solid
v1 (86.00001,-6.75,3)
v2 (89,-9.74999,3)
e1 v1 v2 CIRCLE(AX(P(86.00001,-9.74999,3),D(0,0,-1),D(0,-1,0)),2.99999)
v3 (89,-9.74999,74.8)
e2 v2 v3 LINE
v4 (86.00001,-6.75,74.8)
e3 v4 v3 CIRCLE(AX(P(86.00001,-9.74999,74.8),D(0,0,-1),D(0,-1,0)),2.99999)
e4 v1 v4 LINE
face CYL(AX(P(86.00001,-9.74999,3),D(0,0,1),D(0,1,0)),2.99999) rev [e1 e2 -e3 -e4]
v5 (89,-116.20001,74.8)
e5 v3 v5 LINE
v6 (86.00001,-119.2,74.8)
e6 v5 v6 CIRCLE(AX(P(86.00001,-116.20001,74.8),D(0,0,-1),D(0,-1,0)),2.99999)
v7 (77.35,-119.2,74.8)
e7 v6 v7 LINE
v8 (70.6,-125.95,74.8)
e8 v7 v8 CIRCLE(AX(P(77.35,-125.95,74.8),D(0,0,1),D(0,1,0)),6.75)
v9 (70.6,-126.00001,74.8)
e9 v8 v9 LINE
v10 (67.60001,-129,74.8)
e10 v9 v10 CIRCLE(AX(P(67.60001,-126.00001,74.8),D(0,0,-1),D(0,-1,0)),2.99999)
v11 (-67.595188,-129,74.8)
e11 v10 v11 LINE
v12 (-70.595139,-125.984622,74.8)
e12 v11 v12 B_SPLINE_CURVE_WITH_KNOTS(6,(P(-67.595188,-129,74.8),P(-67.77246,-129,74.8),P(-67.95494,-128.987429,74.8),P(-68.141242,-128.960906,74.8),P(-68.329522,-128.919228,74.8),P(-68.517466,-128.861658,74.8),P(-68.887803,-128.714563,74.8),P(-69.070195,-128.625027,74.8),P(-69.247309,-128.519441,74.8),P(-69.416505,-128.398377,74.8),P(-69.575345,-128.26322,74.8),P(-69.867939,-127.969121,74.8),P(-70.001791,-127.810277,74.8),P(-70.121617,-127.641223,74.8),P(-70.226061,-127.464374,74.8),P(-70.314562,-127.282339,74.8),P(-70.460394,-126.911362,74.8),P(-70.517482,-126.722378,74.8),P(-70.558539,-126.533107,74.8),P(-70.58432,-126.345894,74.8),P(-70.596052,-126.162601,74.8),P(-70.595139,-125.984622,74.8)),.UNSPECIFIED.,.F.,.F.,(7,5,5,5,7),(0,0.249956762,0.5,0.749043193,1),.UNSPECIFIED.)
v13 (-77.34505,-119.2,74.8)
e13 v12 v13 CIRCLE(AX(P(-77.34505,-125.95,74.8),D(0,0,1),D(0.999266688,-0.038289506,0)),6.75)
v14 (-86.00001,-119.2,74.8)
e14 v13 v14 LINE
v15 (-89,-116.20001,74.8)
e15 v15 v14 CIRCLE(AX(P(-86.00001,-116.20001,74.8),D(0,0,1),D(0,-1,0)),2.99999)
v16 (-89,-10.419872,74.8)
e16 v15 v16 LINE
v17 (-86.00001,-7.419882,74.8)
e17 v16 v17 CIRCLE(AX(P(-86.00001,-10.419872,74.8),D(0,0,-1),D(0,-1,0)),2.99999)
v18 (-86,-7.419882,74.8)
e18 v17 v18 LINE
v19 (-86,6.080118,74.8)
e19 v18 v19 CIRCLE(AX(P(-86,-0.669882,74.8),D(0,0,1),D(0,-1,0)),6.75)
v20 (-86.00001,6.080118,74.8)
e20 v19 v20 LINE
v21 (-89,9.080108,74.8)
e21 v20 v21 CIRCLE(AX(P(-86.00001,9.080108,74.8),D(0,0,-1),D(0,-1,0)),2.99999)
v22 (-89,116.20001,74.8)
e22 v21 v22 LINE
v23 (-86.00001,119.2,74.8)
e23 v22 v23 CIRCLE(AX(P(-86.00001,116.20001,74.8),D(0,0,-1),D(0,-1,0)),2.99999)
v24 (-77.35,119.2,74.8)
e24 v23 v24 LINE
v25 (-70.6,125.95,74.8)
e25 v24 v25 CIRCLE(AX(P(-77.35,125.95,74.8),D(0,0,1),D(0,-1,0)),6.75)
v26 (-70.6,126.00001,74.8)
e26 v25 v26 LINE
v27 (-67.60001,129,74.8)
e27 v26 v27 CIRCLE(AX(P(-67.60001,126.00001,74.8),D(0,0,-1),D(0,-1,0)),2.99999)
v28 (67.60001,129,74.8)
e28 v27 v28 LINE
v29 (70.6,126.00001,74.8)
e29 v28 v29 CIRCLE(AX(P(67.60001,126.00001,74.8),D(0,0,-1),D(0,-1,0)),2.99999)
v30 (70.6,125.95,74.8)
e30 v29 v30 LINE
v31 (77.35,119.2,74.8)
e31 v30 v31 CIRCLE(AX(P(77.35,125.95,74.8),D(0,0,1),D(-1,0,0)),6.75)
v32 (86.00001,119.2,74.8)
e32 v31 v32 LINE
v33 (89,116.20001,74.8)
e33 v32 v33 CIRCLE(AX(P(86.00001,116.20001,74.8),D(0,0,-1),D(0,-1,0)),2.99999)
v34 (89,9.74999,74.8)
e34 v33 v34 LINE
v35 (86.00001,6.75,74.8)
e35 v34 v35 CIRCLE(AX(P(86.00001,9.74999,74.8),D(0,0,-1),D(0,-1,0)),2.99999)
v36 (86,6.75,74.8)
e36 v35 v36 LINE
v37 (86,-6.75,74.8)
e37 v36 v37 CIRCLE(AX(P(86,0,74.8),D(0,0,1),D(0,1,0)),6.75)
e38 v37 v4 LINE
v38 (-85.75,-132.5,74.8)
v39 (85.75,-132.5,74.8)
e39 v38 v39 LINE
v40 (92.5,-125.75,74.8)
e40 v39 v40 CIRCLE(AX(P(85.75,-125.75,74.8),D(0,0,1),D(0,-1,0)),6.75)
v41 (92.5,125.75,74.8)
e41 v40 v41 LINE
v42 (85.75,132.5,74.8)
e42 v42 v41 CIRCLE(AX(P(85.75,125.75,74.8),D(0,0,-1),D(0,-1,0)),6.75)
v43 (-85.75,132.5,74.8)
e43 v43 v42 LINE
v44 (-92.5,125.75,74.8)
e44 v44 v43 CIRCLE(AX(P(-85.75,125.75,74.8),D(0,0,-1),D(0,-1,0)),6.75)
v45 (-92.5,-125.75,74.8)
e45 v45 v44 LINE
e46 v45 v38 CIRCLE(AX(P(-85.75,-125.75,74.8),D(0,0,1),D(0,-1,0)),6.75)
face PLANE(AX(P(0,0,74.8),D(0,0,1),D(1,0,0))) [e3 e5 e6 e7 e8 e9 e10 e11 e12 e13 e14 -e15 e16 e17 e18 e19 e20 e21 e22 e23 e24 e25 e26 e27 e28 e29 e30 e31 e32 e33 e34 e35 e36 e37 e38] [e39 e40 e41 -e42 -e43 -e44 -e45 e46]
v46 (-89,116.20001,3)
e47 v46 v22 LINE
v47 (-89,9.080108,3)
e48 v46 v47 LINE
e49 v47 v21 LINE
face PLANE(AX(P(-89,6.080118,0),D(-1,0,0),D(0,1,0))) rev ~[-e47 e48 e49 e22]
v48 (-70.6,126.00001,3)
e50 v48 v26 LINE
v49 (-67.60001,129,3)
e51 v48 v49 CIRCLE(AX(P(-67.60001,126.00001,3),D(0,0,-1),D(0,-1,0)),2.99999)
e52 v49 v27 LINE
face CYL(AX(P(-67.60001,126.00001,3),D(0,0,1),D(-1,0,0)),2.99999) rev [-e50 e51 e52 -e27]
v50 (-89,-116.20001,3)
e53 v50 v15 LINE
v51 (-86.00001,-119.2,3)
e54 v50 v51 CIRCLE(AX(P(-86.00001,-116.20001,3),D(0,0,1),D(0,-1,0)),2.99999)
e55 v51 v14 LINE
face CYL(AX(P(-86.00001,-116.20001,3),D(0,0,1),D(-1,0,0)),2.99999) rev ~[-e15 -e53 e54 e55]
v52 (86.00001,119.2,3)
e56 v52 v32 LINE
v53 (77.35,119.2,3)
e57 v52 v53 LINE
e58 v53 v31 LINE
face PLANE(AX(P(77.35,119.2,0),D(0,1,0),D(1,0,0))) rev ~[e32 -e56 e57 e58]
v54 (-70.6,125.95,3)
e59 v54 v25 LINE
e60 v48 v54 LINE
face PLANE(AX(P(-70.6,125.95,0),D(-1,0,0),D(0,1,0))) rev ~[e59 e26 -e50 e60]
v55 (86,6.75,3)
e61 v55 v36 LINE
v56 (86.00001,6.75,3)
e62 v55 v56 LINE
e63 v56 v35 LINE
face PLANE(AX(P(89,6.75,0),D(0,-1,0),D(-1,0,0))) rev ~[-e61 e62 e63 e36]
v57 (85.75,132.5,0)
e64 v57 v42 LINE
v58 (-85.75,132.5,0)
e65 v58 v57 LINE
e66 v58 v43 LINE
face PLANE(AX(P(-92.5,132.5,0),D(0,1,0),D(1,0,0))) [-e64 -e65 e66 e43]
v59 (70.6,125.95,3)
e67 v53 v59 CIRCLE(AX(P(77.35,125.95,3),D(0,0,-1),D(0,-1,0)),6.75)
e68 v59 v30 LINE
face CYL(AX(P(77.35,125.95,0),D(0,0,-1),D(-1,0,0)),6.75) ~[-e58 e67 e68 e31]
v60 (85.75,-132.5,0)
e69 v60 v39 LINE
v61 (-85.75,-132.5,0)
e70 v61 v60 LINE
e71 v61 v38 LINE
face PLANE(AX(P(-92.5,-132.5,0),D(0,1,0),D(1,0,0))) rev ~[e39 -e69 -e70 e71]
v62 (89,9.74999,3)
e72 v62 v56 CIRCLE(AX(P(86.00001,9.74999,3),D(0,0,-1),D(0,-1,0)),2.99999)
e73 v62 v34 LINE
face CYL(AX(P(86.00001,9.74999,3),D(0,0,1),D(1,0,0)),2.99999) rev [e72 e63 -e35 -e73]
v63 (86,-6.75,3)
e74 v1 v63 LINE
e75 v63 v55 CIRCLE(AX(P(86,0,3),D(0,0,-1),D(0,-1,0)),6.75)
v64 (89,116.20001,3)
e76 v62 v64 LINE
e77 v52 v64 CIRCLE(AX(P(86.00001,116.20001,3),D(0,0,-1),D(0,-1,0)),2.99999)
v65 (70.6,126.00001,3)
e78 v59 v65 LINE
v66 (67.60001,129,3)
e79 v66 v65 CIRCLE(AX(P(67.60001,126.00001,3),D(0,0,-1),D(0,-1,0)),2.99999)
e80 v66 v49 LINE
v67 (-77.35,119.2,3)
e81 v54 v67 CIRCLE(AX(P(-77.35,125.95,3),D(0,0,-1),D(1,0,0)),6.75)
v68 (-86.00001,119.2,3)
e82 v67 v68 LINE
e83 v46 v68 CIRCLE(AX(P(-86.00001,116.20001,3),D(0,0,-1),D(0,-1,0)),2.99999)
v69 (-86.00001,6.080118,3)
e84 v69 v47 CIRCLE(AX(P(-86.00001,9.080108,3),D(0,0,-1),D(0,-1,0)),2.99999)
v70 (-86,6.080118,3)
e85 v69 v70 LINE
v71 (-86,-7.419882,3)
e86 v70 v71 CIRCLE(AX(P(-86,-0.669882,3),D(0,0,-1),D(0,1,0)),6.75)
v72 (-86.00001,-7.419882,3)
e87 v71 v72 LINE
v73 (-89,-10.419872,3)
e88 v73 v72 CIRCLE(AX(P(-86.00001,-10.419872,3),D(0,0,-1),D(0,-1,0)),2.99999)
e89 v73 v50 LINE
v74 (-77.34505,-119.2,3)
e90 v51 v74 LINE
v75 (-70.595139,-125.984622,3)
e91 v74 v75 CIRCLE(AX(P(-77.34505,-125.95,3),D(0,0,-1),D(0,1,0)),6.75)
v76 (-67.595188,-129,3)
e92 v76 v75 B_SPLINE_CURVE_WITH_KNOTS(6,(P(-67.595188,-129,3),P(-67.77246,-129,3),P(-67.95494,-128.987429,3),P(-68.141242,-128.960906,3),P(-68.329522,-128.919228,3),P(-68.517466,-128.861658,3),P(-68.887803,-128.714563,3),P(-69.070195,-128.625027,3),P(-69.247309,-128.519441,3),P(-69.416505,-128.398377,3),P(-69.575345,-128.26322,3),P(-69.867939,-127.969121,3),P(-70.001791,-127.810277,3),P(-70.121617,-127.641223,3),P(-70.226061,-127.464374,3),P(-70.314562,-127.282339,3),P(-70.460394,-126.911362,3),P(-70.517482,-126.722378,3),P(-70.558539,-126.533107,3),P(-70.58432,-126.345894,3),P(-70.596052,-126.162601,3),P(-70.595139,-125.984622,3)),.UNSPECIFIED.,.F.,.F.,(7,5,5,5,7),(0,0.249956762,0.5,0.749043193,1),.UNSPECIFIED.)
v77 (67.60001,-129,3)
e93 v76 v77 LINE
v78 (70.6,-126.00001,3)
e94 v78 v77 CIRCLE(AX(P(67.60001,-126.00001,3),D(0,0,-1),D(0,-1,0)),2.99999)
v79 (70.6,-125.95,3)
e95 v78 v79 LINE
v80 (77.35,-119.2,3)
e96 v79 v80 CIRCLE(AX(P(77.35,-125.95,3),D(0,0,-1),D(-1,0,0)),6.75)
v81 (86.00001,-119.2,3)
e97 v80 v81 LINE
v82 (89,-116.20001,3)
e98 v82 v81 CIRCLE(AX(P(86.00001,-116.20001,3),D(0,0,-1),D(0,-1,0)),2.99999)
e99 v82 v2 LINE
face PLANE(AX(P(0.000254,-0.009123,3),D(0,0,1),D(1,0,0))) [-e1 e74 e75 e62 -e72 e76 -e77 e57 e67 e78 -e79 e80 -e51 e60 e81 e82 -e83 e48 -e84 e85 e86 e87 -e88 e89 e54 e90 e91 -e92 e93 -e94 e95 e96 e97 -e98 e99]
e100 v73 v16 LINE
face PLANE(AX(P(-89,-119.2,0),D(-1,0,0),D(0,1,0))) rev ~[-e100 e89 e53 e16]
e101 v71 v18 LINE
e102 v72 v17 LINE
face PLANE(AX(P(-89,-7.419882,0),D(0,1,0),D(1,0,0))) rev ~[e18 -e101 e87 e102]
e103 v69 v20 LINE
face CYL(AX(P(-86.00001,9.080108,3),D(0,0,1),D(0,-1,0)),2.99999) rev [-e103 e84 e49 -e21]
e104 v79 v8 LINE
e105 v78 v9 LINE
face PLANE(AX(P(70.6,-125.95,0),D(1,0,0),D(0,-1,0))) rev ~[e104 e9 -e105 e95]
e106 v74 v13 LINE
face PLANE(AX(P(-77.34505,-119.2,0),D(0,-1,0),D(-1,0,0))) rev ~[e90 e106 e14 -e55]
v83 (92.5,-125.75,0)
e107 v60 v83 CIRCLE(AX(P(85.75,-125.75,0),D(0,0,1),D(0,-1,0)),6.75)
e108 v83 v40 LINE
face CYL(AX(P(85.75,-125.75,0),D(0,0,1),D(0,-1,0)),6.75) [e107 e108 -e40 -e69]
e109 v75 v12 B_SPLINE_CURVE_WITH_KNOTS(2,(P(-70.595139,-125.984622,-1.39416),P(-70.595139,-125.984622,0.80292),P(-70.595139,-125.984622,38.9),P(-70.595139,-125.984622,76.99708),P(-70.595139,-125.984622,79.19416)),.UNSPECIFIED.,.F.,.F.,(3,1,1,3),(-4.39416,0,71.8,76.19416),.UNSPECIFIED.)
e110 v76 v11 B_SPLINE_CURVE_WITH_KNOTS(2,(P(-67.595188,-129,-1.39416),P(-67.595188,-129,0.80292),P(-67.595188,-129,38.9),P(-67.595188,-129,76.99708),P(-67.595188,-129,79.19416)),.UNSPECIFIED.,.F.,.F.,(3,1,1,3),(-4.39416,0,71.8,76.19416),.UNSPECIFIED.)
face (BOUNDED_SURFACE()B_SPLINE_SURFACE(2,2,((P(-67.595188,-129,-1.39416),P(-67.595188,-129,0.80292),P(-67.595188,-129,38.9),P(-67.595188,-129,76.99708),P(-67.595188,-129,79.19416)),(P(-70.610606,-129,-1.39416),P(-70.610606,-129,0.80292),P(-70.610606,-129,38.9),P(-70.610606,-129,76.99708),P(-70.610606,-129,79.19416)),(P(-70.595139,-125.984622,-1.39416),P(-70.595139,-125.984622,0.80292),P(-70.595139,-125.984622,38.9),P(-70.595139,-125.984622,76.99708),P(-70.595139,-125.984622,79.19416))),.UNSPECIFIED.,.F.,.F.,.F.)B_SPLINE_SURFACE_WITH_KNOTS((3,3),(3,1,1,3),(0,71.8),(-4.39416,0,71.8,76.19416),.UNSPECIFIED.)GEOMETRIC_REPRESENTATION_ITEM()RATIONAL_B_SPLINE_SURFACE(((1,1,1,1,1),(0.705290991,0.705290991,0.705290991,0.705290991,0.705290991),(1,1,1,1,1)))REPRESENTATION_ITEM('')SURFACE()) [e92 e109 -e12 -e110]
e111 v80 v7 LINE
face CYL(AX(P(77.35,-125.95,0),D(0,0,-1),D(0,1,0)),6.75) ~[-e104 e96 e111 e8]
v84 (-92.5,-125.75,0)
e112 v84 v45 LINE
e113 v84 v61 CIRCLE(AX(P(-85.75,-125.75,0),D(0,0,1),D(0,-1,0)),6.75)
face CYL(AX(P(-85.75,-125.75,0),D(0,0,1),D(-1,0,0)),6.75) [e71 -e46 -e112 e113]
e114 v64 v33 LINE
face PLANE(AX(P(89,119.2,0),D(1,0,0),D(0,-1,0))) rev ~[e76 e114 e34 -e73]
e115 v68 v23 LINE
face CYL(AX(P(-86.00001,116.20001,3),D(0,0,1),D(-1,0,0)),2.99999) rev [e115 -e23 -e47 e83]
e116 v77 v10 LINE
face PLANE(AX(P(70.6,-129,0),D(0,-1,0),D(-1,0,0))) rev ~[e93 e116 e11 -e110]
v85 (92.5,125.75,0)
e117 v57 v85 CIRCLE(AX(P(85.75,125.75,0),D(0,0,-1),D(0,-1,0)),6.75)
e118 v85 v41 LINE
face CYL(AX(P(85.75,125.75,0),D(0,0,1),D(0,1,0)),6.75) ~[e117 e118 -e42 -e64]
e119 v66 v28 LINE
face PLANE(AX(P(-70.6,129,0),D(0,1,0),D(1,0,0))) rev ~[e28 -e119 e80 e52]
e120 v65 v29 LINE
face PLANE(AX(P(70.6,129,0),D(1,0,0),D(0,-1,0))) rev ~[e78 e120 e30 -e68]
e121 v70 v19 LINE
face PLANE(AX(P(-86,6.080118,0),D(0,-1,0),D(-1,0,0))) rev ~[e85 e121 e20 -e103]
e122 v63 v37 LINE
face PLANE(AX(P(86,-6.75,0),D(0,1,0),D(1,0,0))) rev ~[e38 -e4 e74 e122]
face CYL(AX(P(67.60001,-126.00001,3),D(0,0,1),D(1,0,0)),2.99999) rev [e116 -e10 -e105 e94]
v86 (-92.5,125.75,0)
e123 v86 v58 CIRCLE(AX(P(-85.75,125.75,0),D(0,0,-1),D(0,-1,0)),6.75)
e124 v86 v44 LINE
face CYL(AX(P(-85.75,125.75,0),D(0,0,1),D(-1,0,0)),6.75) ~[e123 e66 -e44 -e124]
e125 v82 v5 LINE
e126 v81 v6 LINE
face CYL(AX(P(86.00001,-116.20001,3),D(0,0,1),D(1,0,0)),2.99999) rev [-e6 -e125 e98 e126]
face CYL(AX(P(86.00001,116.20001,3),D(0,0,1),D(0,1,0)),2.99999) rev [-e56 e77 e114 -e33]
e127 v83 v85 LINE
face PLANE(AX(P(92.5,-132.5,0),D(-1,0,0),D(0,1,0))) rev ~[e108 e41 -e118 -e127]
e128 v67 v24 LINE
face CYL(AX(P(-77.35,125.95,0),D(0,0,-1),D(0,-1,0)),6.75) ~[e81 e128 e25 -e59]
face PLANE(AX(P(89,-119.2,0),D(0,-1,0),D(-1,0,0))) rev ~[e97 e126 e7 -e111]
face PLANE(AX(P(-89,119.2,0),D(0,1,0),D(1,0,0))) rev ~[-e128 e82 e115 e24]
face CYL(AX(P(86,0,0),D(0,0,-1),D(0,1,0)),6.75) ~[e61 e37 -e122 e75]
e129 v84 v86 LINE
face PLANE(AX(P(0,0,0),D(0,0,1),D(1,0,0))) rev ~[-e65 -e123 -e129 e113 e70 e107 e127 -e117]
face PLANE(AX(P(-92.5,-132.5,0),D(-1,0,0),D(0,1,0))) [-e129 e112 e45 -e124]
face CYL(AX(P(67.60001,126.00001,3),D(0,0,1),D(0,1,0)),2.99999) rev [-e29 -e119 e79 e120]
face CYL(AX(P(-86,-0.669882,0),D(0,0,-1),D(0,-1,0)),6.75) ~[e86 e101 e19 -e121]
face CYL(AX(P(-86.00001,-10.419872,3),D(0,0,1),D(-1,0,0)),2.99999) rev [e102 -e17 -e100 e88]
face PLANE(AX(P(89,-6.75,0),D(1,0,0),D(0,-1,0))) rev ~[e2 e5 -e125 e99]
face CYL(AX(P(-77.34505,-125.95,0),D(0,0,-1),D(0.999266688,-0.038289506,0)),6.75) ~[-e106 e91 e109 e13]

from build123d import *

# Parameters (mm, degrees)
F1_DEPTH = 3
F0_W     = 185
F0_H     = 265
F2_DEPTH = 74.8
F3_R     = 6.75
F4_R     = 2.99999


# Not quite as in the source:
# - a fillet or chamfer is up to 0.001 mm smaller than in the source, because OpenCascade refuses the exact size
# - ends of sketch curves that miss each other by under 0.0002 mm in the source are joined


with BuildPart() as f1:
    # F0 (on Top) → F1 (new body)
    with BuildSketch(Plane.XY):
        with BuildLine():
            Line((70.6, 125.95), (70.6, 129))
            Line((70.6, 129), (-70.6, 129))
            Line((-70.6, 129), (-70.6, 125.95))
            ThreePointArc((-70.6, 125.95), (-72.577029227, 121.177029227), (-77.35, 119.2))
            Line((-77.35, 119.2), (-89, 119.2))
            Line((-89, 119.2), (-89, 6.080118008))
            Line((-89, 6.080118008), (-86, 6.080118008))
            ThreePointArc((-86, 6.080118008), (-79.25, -0.669881992), (-86, -7.419881992))
            Line((-86, -7.419881992), (-89, -7.419881992))
            Line((-89, -7.419881992), (-89, -119.2))
            Line((-89, -119.2), (-77.3450501441, -119.2))
            ThreePointArc((-77.3450501441, -119.2), (-72.4815603684, -121.2692984284), (-70.6, -126.2084541623))
            Line((-70.6, -126.2084541623), (-70.6, -129))
            Line((-70.6, -129), (70.6, -129))
            Line((70.6, -129), (70.6, -125.95))
            ThreePointArc((70.6, -125.95), (72.577029227, -121.177029227), (77.35, -119.2))
            Line((77.35, -119.2), (89, -119.2))
            Line((89, -119.2), (89, -6.75))
            Line((89, -6.75), (86, -6.75))
            ThreePointArc((86, -6.75), (79.25, 0), (86, 6.75))
            Line((86, 6.75), (89, 6.75))
            Line((89, 6.75), (89, 119.2))
            Line((89, 119.2), (77.35, 119.2))
            ThreePointArc((77.35, 119.2), (72.577029227, 121.177029227), (70.6, 125.95))
        make_face()
    extrude(amount=F1_DEPTH)

    # F0 (on Top) → F2 (join)
    with BuildSketch(Plane.XY):
        Rectangle(F0_W, F0_H)
        Polygon((70.6, 129), (89, 129), (89, 119.2), (89, 6.75), (89, -6.75), (89, -119.2), (89, -129), (70.6, -129), (-70.6, -129), (-89, -129), (-89, -119.2), (-89, -7.419881992), (-89, 6.080118008), (-89, 119.2), (-89, 129), (-70.6, 129), align=None, mode=Mode.SUBTRACT)
        with BuildLine():
            Line((-77.3450501441, -119.2), (-89, -119.2))
            Line((-89, -119.2), (-89, -129))
            Line((-89, -129), (-70.6, -129))
            Line((-70.6, -129), (-70.6, -126.2084541623))
            ThreePointArc((-70.6, -126.2084541623), (-72.4815603684, -121.2692984284), (-77.3450501441, -119.2))
        make_face()
        with BuildLine():
            Line((89, -129), (89, -119.2))
            Line((89, -119.2), (77.35, -119.2))
            ThreePointArc((77.35, -119.2), (72.577029227, -121.177029227), (70.6, -125.95))
            Line((70.6, -125.95), (70.6, -129.000006485))
            Line((70.6, -129.000006485), (89, -129))
        make_face()
        with BuildLine():
            Line((-70.6, 125.95), (-70.6, 129))
            Line((-70.6, 129), (-89, 129))
            Line((-89, 129), (-89, 119.2))
            Line((-89, 119.2), (-77.35, 119.2))
            ThreePointArc((-77.35, 119.2), (-72.577029227, 121.177029227), (-70.6, 125.95))
        make_face()
        with BuildLine():
            Line((89, 119.2), (89, 129))
            Line((89, 129), (70.6, 129))
            Line((70.6, 129), (70.6, 125.95))
            ThreePointArc((70.6, 125.95), (72.577029227, 121.177029227), (77.35, 119.2))
            Line((77.35, 119.2), (89, 119.2))
        make_face()
        with BuildLine():
            Line((-86, 6.080118008), (-89, 6.080118008))
            Line((-89, 6.080118008), (-89, -7.419881992))
            Line((-89, -7.419881992), (-86, -7.419881992))
            ThreePointArc((-86, -7.419881992), (-79.25, -0.669881992), (-86, 6.080118008))
        make_face()
        with BuildLine():
            Line((89, -6.75), (89, 6.75))
            Line((89, 6.75), (86, 6.75))
            ThreePointArc((86, 6.75), (79.25, 0), (86, -6.75))
            Line((86, -6.75), (89, -6.75))
        make_face()
    extrude(amount=F2_DEPTH)

    # F3
    f3_edges = [f1.edges().sort_by_distance(p)[0] for p in [
        (-92.5, 132.5, 37.4),
        (92.5, 132.5, 37.4),
        (92.5, -132.5, 37.4),
        (-92.5, -132.5, 37.4),
    ]]
    fillet(f3_edges, radius=F3_R)

    # F4 (radius 3 in the source; OpenCascade refuses exactly that, so slightly less here)
    f4_edges = [f1.edges().sort_by_distance(p)[0] for p in [
        (-89, 6.080118, 38.9),
        (-89, 119.2, 38.9),
        (-70.6, 129, 38.9),
        (70.6, 129, 38.9),
        (89, 119.2, 38.9),
        (-89, -7.419882, 38.9),
        (89, 6.75, 38.9),
        (89, -6.75, 38.9),
        (-89, -119.2, 38.9),
        (-70.6, -129, 38.9),
        (70.6, -129, 38.9),
        (89, -119.2, 38.9),
    ]]
    fillet(f4_edges, radius=F4_R)


solid = f1.part
